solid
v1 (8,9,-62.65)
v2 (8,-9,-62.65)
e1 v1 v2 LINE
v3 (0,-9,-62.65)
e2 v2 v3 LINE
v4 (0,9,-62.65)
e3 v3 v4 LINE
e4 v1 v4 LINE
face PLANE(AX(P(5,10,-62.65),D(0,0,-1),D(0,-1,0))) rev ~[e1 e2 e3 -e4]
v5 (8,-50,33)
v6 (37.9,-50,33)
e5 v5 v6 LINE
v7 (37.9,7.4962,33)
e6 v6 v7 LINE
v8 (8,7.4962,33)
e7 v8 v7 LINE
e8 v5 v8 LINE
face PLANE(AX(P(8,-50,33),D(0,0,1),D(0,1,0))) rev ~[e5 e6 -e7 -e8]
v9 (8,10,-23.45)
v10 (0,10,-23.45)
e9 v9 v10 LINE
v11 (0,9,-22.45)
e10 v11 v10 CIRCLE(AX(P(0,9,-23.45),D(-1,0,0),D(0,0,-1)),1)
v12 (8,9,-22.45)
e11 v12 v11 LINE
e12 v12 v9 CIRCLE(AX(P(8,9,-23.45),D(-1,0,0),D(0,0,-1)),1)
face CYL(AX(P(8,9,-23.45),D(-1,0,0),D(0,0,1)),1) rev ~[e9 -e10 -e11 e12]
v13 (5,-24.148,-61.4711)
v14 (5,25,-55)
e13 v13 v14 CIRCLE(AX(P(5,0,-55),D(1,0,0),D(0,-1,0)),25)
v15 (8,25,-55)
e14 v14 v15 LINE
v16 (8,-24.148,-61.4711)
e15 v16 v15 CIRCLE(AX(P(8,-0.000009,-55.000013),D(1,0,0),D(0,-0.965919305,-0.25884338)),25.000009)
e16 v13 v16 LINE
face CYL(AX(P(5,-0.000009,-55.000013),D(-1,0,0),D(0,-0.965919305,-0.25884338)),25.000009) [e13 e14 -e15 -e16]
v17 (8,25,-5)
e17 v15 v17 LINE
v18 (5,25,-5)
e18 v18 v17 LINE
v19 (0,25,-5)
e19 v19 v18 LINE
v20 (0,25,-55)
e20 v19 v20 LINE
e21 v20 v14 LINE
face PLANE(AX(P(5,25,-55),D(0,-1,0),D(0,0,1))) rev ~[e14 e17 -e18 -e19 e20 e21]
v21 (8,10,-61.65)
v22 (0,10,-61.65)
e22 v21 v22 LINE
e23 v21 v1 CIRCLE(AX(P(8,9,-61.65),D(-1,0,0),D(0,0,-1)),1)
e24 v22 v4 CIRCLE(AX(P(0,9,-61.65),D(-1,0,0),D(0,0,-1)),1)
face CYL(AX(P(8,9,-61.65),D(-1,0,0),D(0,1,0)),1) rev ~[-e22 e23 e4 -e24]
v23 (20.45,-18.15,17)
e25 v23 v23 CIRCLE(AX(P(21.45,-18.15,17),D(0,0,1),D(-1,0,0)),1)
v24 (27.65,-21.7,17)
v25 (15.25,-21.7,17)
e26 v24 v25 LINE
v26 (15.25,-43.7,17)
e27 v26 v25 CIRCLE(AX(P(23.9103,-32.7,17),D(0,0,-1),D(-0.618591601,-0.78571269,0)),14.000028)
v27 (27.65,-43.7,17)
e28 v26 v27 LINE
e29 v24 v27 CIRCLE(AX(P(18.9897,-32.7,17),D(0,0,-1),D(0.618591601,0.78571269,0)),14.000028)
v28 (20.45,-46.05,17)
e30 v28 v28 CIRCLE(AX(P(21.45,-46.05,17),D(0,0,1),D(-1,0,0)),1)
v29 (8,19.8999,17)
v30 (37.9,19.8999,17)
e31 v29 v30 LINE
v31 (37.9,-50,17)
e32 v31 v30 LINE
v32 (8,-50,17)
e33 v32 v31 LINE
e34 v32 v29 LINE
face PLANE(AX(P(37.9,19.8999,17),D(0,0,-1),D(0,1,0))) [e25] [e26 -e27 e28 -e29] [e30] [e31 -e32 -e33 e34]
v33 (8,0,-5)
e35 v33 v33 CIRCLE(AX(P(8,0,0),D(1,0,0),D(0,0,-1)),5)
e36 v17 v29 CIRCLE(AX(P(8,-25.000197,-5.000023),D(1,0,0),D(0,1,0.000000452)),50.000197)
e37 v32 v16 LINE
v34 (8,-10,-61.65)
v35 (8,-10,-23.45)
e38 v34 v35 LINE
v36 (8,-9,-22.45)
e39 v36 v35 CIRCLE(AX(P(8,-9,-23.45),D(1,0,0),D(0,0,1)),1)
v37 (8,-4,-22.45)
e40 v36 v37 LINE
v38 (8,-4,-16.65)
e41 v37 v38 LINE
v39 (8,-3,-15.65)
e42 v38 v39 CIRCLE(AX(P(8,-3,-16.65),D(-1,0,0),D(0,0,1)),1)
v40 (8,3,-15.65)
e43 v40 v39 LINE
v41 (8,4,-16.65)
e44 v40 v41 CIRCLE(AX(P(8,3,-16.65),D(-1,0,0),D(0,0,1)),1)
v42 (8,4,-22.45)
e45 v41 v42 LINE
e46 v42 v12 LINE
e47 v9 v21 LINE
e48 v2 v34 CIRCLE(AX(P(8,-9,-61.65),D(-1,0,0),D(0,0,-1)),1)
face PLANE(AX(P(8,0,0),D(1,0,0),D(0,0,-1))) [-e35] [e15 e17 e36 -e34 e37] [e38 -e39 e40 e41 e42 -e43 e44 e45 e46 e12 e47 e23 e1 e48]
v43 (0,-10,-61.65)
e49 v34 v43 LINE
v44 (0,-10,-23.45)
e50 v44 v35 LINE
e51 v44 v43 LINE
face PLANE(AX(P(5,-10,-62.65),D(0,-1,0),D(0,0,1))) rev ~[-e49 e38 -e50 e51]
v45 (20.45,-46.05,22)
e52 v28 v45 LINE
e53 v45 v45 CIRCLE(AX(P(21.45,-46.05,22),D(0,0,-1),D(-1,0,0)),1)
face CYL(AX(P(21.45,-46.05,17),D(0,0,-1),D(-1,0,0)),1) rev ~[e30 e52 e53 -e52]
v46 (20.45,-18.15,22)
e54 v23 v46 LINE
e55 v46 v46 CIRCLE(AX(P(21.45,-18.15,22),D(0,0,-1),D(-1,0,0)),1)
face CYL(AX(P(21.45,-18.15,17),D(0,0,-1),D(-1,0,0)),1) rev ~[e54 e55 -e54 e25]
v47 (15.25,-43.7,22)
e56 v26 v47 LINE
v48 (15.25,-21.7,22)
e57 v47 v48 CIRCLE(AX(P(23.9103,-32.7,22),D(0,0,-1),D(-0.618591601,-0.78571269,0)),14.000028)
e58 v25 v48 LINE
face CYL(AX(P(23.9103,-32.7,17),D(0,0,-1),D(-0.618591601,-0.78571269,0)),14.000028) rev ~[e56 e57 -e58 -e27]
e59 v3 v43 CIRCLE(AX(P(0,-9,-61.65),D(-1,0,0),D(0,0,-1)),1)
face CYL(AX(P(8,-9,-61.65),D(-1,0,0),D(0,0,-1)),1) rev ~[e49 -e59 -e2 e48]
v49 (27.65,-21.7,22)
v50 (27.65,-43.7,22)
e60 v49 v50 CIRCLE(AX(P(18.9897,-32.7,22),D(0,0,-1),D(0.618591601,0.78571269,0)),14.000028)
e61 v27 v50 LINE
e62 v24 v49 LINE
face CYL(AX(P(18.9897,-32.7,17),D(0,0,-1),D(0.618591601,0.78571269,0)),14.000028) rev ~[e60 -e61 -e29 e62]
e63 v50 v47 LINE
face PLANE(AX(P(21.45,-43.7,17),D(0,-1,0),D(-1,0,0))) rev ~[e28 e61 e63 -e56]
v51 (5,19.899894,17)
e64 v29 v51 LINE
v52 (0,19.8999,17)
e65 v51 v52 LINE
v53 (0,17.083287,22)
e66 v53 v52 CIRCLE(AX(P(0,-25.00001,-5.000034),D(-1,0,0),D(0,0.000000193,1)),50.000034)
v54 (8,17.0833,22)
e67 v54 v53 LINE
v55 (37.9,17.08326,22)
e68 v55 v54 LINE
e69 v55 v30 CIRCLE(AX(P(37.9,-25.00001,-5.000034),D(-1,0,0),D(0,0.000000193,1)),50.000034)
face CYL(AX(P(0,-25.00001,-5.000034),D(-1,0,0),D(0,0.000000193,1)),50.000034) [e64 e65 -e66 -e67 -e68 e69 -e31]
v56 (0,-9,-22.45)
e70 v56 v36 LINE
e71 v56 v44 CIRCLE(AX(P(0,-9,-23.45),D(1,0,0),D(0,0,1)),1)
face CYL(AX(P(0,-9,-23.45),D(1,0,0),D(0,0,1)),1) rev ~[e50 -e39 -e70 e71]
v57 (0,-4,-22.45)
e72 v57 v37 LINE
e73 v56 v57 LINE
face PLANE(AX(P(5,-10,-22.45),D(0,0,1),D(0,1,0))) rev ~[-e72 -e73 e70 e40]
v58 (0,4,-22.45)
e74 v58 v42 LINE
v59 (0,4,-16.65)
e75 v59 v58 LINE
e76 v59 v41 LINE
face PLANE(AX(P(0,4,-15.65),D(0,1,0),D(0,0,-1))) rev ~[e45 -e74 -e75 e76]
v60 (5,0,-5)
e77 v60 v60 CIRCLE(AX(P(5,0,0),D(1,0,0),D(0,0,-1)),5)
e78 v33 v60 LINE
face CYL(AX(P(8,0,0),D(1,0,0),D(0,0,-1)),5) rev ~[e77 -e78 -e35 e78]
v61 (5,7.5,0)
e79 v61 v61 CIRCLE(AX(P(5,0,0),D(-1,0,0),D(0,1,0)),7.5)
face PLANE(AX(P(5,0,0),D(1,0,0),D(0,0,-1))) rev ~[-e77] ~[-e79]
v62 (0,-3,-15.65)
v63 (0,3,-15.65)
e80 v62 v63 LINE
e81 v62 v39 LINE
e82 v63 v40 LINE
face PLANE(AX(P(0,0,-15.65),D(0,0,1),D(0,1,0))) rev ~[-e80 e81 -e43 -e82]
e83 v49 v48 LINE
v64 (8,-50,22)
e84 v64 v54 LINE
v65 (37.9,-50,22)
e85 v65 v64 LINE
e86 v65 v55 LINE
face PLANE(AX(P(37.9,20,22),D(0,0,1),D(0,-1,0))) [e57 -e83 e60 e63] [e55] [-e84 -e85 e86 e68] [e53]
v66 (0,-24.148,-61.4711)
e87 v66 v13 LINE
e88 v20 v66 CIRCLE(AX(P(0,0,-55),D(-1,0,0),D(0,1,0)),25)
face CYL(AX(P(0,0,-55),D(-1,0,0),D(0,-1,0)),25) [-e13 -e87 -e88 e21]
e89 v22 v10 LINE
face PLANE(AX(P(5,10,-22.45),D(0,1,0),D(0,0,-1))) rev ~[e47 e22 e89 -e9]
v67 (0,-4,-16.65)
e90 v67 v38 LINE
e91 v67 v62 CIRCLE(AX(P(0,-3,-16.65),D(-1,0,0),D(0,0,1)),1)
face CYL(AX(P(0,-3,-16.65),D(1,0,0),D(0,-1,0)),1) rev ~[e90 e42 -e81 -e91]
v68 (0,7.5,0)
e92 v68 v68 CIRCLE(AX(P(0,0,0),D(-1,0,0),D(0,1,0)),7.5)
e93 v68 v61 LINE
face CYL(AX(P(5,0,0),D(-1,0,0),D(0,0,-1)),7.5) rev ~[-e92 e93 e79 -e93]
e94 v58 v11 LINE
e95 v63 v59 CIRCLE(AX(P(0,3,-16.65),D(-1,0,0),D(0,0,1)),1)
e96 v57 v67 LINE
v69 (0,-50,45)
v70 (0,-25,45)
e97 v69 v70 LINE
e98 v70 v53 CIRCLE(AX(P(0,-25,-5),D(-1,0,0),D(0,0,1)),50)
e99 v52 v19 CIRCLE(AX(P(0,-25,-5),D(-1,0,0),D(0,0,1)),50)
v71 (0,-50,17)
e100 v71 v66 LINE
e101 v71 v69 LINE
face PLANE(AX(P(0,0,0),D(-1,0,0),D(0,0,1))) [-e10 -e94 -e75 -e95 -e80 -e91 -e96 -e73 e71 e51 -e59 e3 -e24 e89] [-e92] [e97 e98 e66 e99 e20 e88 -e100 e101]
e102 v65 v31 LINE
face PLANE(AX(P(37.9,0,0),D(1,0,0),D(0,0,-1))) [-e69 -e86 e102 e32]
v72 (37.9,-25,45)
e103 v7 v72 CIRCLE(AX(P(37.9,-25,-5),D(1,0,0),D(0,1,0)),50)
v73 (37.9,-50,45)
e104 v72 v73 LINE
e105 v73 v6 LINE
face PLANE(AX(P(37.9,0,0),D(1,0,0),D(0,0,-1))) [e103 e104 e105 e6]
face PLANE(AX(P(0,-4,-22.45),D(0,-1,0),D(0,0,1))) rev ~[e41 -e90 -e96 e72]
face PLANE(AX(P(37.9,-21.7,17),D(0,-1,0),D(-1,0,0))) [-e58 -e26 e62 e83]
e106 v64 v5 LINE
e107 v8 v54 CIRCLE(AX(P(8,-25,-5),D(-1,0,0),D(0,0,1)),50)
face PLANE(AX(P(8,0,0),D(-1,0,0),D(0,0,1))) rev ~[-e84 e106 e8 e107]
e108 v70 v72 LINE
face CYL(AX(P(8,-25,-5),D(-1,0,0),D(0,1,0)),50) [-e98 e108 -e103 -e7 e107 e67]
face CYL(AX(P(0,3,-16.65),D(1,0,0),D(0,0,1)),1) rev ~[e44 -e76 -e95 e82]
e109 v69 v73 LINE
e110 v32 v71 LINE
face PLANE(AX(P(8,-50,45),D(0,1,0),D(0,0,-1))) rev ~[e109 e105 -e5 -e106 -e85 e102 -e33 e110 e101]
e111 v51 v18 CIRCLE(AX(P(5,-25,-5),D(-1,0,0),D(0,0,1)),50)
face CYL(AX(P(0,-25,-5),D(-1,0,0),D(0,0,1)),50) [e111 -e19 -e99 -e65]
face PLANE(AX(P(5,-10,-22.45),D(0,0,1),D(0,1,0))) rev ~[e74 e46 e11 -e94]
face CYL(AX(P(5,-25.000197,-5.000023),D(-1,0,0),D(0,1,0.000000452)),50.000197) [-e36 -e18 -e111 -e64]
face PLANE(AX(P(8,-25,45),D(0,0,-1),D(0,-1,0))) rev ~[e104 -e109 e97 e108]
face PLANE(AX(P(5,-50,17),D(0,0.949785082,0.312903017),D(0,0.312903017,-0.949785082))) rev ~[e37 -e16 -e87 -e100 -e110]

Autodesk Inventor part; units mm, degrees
ref_plane "YZ Plane" through (0, 0, 0) normal (1, 0, 0) x (0, 1, 0)
ref_plane "XZ Plane" through (0, 0, 0) normal (0, 1, 0) x (-1, 0, 0)
ref_plane "XY Plane" through (0, 0, 0) normal (0, 0, 1) x (1, 0, 0)
sketch "Sketch1" plane through (0, 0, 0) normal (1, 0, 0) x (0, 1, 0)
  circle A0 centre (0, 0) radius 16.575
  line L0 (0, 16.575) -> (0, -49.725)
  line L1 (0, -33.15) -> (0, -15.05)
  line L2 (0, -15.05) -> (0, -70.05)
  line L3 (10, -70.05) -> (-10, -70.05)
  line L4 (-10, -70.05) -> (-10, -15.05)
  line L5 (-10, -15.05) -> (10, -15.05)
  line L6 (10, -15.05) -> (10, -70.05)
  line L7 (10, -70.05) -> (-10, -15.05) construction
  line L8 (-10, -70.05) -> (10, -15.05) construction
  line L9 (10, -62.65) -> (-10, -62.65)
  line L10 (-10, -62.65) -> (-10, -22.45)
  line L11 (-10, -22.45) -> (10, -22.45)
  line L12 (10, -22.45) -> (10, -62.65)
  line L13 (10, -62.65) -> (-10, -22.45) construction
  line L14 (-10, -62.65) -> (10, -22.45) construction
  line L15 (-4.95, -27.2) -> (-4.95, -17.7)
  line L16 (-4.95, -17.7) -> (4.95, -17.7)
  line L17 (4.95, -27.2) -> (-4.95, -17.7) construction
  line L18 (-4.95, -27.2) -> (4.95, -17.7) construction
  line L19 (4.95, -67.4) -> (-4.95, -67.4)
  line L20 (-4.95, -67.4) -> (-4.95, -57.9)
  line L21 (-4.95, -57.9) -> (4.95, -57.9)
  line L22 (4.95, -67.4) -> (-4.95, -57.9) construction
  line L23 (-4.95, -67.4) -> (4.95, -57.9) construction
  circle A1 centre (4.95, -17.7) radius 1.5
  circle A2 centre (-4.95, -17.7) radius 1.5
  circle A3 centre (4.95, -67.4) radius 1.5
  circle A4 centre (-4.95, -67.4) radius 1.5
  circle A5 centre (0, -33.15) radius 6.8
  line L24 (0, -80) -> (0, -55)
  arc A6 (-25, -55) -> (25, -55) centre (0, -55) ccw
  line L25 (0, 0) -> (0, 45)
  line L26 (25, 45) -> (-25, 45)
  line L27 (25, 45) -> (25, -55)
  line L28 (-25, 45) -> (-25, -55)
  circle A7 centre (0, 0) radius 7.5
  point P0 (0, -42.55)
  point P1 (0, -42.55)
  point P2 (0, -22.45)
  point P3 (0, -62.65)
  dimension "d0" = 33.15
  dimension "d2" = 66.3
  dimension "d4" = 18.1
  dimension "d5" = 55
  dimension "d6" = 20
  dimension "d7" = 55
  dimension "d8" = 40.2
  dimension "d9" = 9.9
  dimension "d10" = 9.5
  dimension "d11" = 9.9
  dimension "d12" = 9.5
  dimension "d13" = 3
  dimension "d14" = 3
  dimension "d15" = 3
  dimension "d16" = 3
  dimension "d17" = 13.6
  dimension "d20" = 25
  dimension "d21" = 45
  dimension "d22" = 15
extrude "Extrusion1" add sketch "Sketch1" along normal blind 5 contours A0 L5 L0 A7 | A0 L25 L26 L27 A6 L24 L3 L6 L5 | L0 A7 L5 A0 | A0 L5 L4 L3 L24 A6 L28 L26 L25 | L5 L6 L11 L0 A0 | A0 L0 L5 | L5 L0 A0 | A0 L0 L16 A2 L15 L11 L4 L5 | L0 L11 L15 A2 L16 | L6 L9 L2 L0 A5 L11 | L11 L0 A5 L2 L21 L20 L9 L4 | L6 L3 L2 L9 | L9 L20 A4 L19 L2 L3 L4 | L9 L20 L21 L2 | L2 L19 A4 L20 L9
sketch "Sketch2" plane through (5, 0, 0) normal (1, 0, 0) x (0, 0, -1)
  line L0 (-45, -25) -> (55, -25) projected
  circle A0 centre (33.15, 0) radius 6.8 projected
  line L1 (33.15, 0) -> (15.05, 0)
  line L2 (15.05, 0) -> (70.05, 0)
  line L3 (62.65, 10) -> (22.45, 10)
  line L4 (22.45, 10) -> (22.45, -10)
  line L5 (22.45, -10) -> (62.65, -10)
  line L6 (62.65, -10) -> (62.65, 10)
  line L7 (62.65, 10) -> (22.45, -10) construction
  line L8 (22.45, 10) -> (62.65, -10) construction
  point P0 (42.55, 0)
  dimension "d25" = 18.1
  dimension "d26" = 55
  dimension "d27" = 40.2
  dimension "d28" = 20
extrude "Extrusion2" cut sketch "Sketch2" against normal blind 5 contours L2 L6 L5 L4 L1 A0 | A0 L1 L4 L3 L6 L2
sketch "Sketch3" plane through (5, 0, 0) normal (1, 0, 0) x (0, 0, -1)
  circle A0 centre (17.7, 4.95) radius 1.5 projected
  circle A1 centre (17.7, -4.95) radius 1.5 projected
  circle A2 centre (67.4, 4.95) radius 1.5 projected
  circle A3 centre (67.4, -4.95) radius 1.5 projected
extrude "Extrusion3" add sketch "Sketch3" against normal blind 5
sketch "Sketch4" plane through (5, 0, 0) normal (1, 0, 0) x (0, 0, -1)
  line L0 (55, 25) -> (-45, 25) projected
  line L1 (-45, 25) -> (-45, -25) projected
  line L2 (-45, -25) -> (55, -25) projected
  line L3 (-45, 25) -> (-35, 25)
  line L4 (-35, 25) -> (-35, -25)
  line L5 (-35, -25) -> (-45, -25)
  line L6 (-45, -25) -> (-45, 25)
  dimension "d33" = 10
extrude "Extrusion4" add sketch "Sketch4" along normal blind 32.9
sketch "Sketch5" plane through (0, -25, -55) normal (0, -1, 0) x (1, 0, 0)
  line L0 (5, 90) -> (37.9, 90)
  line L1 (37.9, 90) -> (37.9, 100)
  line L2 (37.9, 100) -> (5, 100)
  line L3 (5, 100) -> (5, 90)
  point P0 (0, 55)
extrude "Extrusion5" add sketch "Sketch5" along normal blind 25
sketch "Sketch6" plane through (0, 0, 0) normal (-1, 0, 0) x (0, 0, 1)
  arc A0 (-55, 25) -> (-55, -25) centre (-55, 0) ccw projected
  line L0 (45, -25) -> (-55, -25) projected
  line L1 (-55, 25) -> (45, 25) projected
  line L2 (45, -25) -> (45, -50)
  line L3 (45, -50) -> (35, -50)
  line L4 (35, -50) -> (-61.4711, -24.148)
  line L5 (-55, -25) -> (45, -25)
  arc A1 (-61.4711, -24.148) -> (-55, -25) centre (-55, 0) ccw
  dimension "d38" = 25
  dimension "d39" = 10
extrude "Extrusion6" add sketch "Sketch6" against normal blind 5
sketch "Sketch7" plane through (0, 25, 45) normal (0, 0, 1) x (1, 0, 0)
  line L0 (37.9, -75) -> (0, -75) projected
  line L1 (0, 0) -> (37.9, 0) projected
  line L2 (18.95, -75) -> (18.95, -62.5)
  circle A0 centre (18.95, -62.5) radius 7.5
  point P0 (0, -25)
  dimension "d42" = 12.5
  dimension "d43" = 15
extrude "Extrusion7" cut sketch "Sketch7" against normal blind 10
sketch "Sketch8" plane through (5, 0, 0) normal (1, 0, 0) x (0, 0, -1)
  line L0 (-35, 25) -> (-35, -50) projected
  line L1 (55, 25) -> (-35, 25) projected
  line L2 (-35, -50) -> (-35, 25)
  line L3 (-35, -50) -> (-17, -50)
  line L4 (-17, -50) -> (-17, 25)
  line L5 (-17, -50) -> (61.4711, -24.148)
  line L6 (-17, -50) -> (-22, -50)
  line L7 (-22, -50) -> (-22, 25)
  line L8 (-17, 25) -> (-22, 25)
  dimension "d46" = 18
  dimension "d47" = 5
extrude "Extrusion8" add sketch "Sketch8" along normal blind 32.9 contours L1 L4 L3 L7
sketch "Sketch9" plane through (0, 0, 0) normal (-1, 0, 0) x (0, 0, 1)
  line L0 (-61.4711, -24.148) -> (35, -50) projected
  arc A0 (-55, 25) -> (-61.4711, -24.148) centre (-55, 0) ccw projected
  line L1 (17, -50) -> (-61.4711, -24.148)
  line L2 (-61.4711, -24.148) -> (35, -50)
  line L3 (35, -50) -> (17, -50)
  line L4 (35, -50) -> (17, -50)
  line L5 (17, -50) -> (-61.4711, -24.148)
  line L6 (-61.4711, -24.148) -> (35, -50)
  point P0 (45, -50)
  dimension "d50" = 28
extrude "Extrusion9" add sketch "Sketch9" against normal blind 5
sketch "Sketch11" plane through (0, 25, 45) normal (0, 0, 1) x (1, 0, 0)
  circle A0 centre (18.95, -62.5) radius 7.5 projected
  point P0 (0, -25)
extrude "Extrusion10" add sketch "Sketch11" against normal blind 10
sketch "Sketch12" plane through (0, 25, 45) normal (0, 0, 1) x (1, 0, 0)
  line L0 (37.9, -75) -> (0, -75) projected
  line L1 (0, -75) -> (5, -75)
  line L2 (37.9, -75) -> (5, -75)
  line L3 (21.45, -75) -> (21.45, -62.5)
  circle A0 centre (21.45, -62.5) radius 6.8
  point P0 (0, -25)
  dimension "d55" = 5
  dimension "d56" = 12.5
  dimension "d57" = 13.6
extrude "Extrusion11" cut sketch "Sketch12" against normal blind 10
sketch "Sketch13" plane through (37.9, 25, 17) normal (0, 0, -1) x (-1, 0, 0)
  line L0 (32.9, -75) -> (0, -75) projected
  line L1 (16.45, -75) -> (16.45, -62.5)
  circle A0 centre (16.45, -62.5) radius 6.2
  line L2 (16.45, -62.5) -> (16.45, -50.3)
  circle A1 centre (16.45, -56.4) radius 3.1
  point P0 (37.9, -25)
  dimension "d60" = 12.5
  dimension "d61" = 12.4
  dimension "d62" = 12.2
  dimension "d63" = 6.2
extrude "Extrusion12" cut sketch "Sketch13" against normal blind 5
sketch "Sketch15" plane through (37.9, 25, 17) normal (0, 0, -1) x (-1, 0, 0)
  arc A0 (13.4271, -57.0869) -> (19.4729, -57.0869) centre (16.45, -62.5) ccw projected
  line L0 (32.9, -75) -> (0, -75) projected
  line L1 (16.45, -62.5) -> (16.45, -73.1)
  circle A1 centre (16.45, -73.1) radius 1
  line L2 (16.45, -62.5) -> (16.45, -41.1)
  circle A2 centre (16.45, -41.1) radius 1
  point P0 (37.9, -25)
  dimension "d66" = 10.6
  dimension "d67" = 2
  dimension "d68" = 21.4
  dimension "d69" = 2
extrude "Extrusion13" cut sketch "Sketch15" against normal blind 5
sketch "Sketch16" plane through (37.9, 25, 17) normal (0, 0, -1) x (-1, 0, 0)
  circle A0 centre (16.45, -73.1) radius 1 projected
  circle A1 centre (16.45, -41.1) radius 1 projected
  line L0 (32.9, -75) -> (0, -75) projected
  line L1 (16.45, -41.1) -> (16.45, -43.15)
  line L2 (16.45, -73.1) -> (16.45, -71.05)
  point P0 (37.9, -25)
  dimension "d72" = 2.05
  dimension "d73" = 2.05
extrude "Extrusion14" add sketch "Sketch16" against normal blind 5
sketch "Sketch17" plane through (37.9, 25, 17) normal (0, 0, -1) x (-1, 0, 0)
  arc A0 (13.4271, -57.0869) -> (19.4729, -57.0869) centre (16.45, -62.5) ccw projected
  line L0 (32.9, -75) -> (0, -75) projected
  line L1 (16.45, -62.5) -> (16.45, -41.1)
  line L2 (16.45, -41.1) -> (16.45, -43.15)
  circle A1 centre (16.45, -43.15) radius 1
  line L3 (16.45, -62.5) -> (16.45, -73.1)
  line L4 (16.45, -73.1) -> (16.45, -71.05)
  circle A2 centre (16.45, -71.05) radius 1
  point P0 (37.9, -25)
  dimension "d76" = 21.4
  dimension "d77" = 2.05
  dimension "d78" = 2
  dimension "d79" = 10.6
  dimension "d80" = 2.05
  dimension "d81" = 2
extrude "Extrusion15" cut sketch "Sketch17" against normal blind 5
sketch "Sketch18" plane through (0, 0, 0) normal (-1, 0, 0) x (0, 0, 1)
  line L0 (45, 25) -> (45, -50) projected
  line L1 (-55, 25) -> (45, 25) projected
  line L2 (45, 25) -> (45, -20)
  line L3 (45, 25) -> (0, 25)
  line L4 (0, 25) -> (-5, 25)
  line L5 (45, -20) -> (45, -25)
  arc A0 (45, -25) -> (-5, 25) centre (-5, -25) ccw
  dimension "d84" = 45
  dimension "d86" = 5
  dimension "d87" = 5
extrude "Extrusion16" cut sketch "Sketch18" against normal blind 39
sketch "Sketch19" plane through (37.9, -50, 17) normal (0, 0, -1) x (-1, 0, 0)
  line L0 (32.9, 0) -> (32.9, 69.8999) projected
  arc A0 (13.4271, 17.9131) -> (19.4729, 17.9131) centre (16.45, 12.5) ccw projected
  arc A1 (19.4729, 17.9131) -> (13.4271, 17.9131) centre (16.45, 18.6) ccw projected
  line L1 (0, 25) -> (0, 0) projected
  line L2 (0, 6.3) -> (32.9, 6.3)
  line L3 (0, 6.3) -> (0, 28.3)
  line L4 (0, 55) -> (0, 25) projected
  line L5 (0, 28.3) -> (32.9, 28.3)
  line L6 (32.9, 28.3) -> (32.9, 6.3)
  point P0 (37.9, 50)
  dimension "d90" = 22
extrude "Extrusion17" cut sketch "Sketch19" against normal blind 5
sketch "Sketch21" plane through (5, 0, 0) normal (1, 0, 0) x (0, 0, -1)
  line L0 (22.45, -10) -> (22.45, 10) projected
  line L1 (22.45, 10) -> (62.65, 10) projected
  line L2 (62.65, 10) -> (62.65, -10) projected
  line L3 (62.65, -10) -> (22.45, -10) projected
  circle A0 centre (0, 0) radius 7.5 projected
  arc A1 (-22, 17.0833) -> (-35, 5) centre (5, -25) ccw projected
  line L4 (-35, 5) -> (-35, -50) projected
  line L5 (-35, -50) -> (-22, -50) projected
  line L6 (-22, -43.7) -> (-22, -50) projected
  line L7 (-17, -43.7) -> (-22, -43.7) projected
  line L8 (-17, -50) -> (-17, -43.7) projected
  line L9 (-17, -50) -> (61.4711, -24.148) projected
  arc A2 (61.4711, -24.148) -> (55, 25) centre (55, 0) ccw projected
  line L10 (55, 25) -> (5, 25) projected
  arc A3 (5, 25) -> (-17, 19.8999) centre (5, -25) ccw projected
  line L11 (-17, -21.7) -> (-17, 19.8999) projected
  line L12 (-17, -21.7) -> (-22, -21.7) projected
  line L13 (-22, 17.0833) -> (-22, -21.7) projected
extrude "Extrusion18" add sketch "Sketch21" along normal blind 3
sketch "Sketch22" plane through (0, -50, 45) normal (0, 0, 1) x (1, 0, 0)
  circle A0 centre (21.45, 12.5) radius 6.8 projected
  circle A1 centre (21.45, 12.5) radius 5
  point P0 (0, 50)
  dimension "d95" = 10
extrude "Extrusion19" add sketch "Sketch22" against normal blind 2
sketch "Sketch23" plane through (37.9, -50, 35) normal (0, 0, -1) x (-1, 0, 0)
  circle A0 centre (16.45, 12.5) radius 6.8 projected
  line L0 (29.9, 0) -> (29.9, 55) projected
  line L1 (29.9, 55) -> (0, 55) projected
  line L2 (0, 55) -> (0, 0) projected
  line L3 (29.9, 0) -> (0, 0) projected
  point P0 (37.9, 50)
extrude "Extrusion20" add sketch "Sketch23" along normal blind 2
sketch "Sketch24" plane through (37.9, -21.7, 17) normal (0, -1, 0) x (1, 0, 0)
  line L0 (-29.9, 5) -> (0, 5) projected
  line L1 (0, 0) -> (-10.25, 0)
  line L2 (-10.25, 0) -> (-10.25, 5)
  line L3 (-10.25, 5) -> (0, 5)
  line L4 (0, 5) -> (0, 0)
  line L5 (-29.9, 0) -> (-22.65, 0)
  line L6 (-22.65, 0) -> (-22.65, 5)
  line L7 (-22.65, 5) -> (-29.9, 5)
  line L8 (-29.9, 5) -> (-29.9, 0)
  point P0 (-37.9, -17)
  dimension "d100" = 10.25
  dimension "d101" = 7.25
extrude "Extrusion21" add sketch "Sketch24" along normal blind 22
sketch "Sketch25" plane through (37.9, -50, 33) normal (0, 0, -1) x (-1, 0, 0)
  circle A0 centre (16.45, 12.5) radius 6.8 projected
  circle A1 centre (16.45, 12.5) radius 5
  point P0 (37.9, 50)
  dimension "d104" = 10
extrude "Extrusion22" add sketch "Sketch25" against normal blind 2
sketch "Sketch26" plane through (8, 0, 0) normal (1, 0, 0) x (0, 0, -1)
  circle A0 centre (0, 0) radius 7.5 projected
  circle A1 centre (0, 0) radius 5
  dimension "d107" = 10
extrude "Extrusion23" add sketch "Sketch26" against normal blind 3
sketch "Sketch28" plane through (37.9, -50, 17) normal (0, 0, -1) x (-1, 0, 0)
  line L0 (10.25, 28.3) -> (10.25, 6.3) projected
  line L1 (22.65, 28.3) -> (22.65, 6.3) projected
  arc A0 (22.65, 6.3) -> (22.65, 28.3) centre (13.9897, 17.3) ccw
  arc A1 (10.25, 28.3) -> (10.25, 6.3) centre (18.9103, 17.3) ccw
  point P0 (37.9, 50)
  dimension "d111" = 14
  dimension "d112" = 14
extrude "Extrusion24" cut sketch "Sketch28" against normal blind 5
sketch "Sketch29" plane through (37.9, 0, 0) normal (1, 0, 0) x (0, 0, -1)
  arc A0 (-35, 5) -> (-45, -25) centre (5, -25) ccw projected
  line L0 (-45, -25) -> (-45, -50) projected
  line L1 (-45, -50) -> (-33, -50) projected
  line L2 (-33, 5) -> (-33, -50) projected
  line L3 (-35, 5) -> (-33, 5) projected
  point P0 (0, 0)
extrude "Extrusion25" cut sketch "Sketch29" against normal blind 29.9
sketch "Sketch30" plane through (0, -50, -55) normal (0, -1, 0) x (1, 0, 0)
  line L0 (8, 100) -> (8, 77) projected
  line L1 (8, 100) -> (0, 100) projected
  line L2 (0, 72) -> (0, 100) projected
  line L3 (8, 77) -> (0, 77)
  point P0 (0, 55)
extrude "Extrusion26" cut sketch "Sketch30" against normal blind 70
sketch "Sketch31" plane through (37.9, 0, 0) normal (1, 0, 0) x (0, 0, -1)
  line L0 (-17, -50) -> (-17, 19.8999) projected
  arc A0 (-17, 19.8999) -> (-22, 17.0833) centre (5, -25) ccw projected
  line L1 (-17, -50) -> (-17, 18)
  line L2 (-17, 18) -> (-17, 20)
  line L3 (-17, 20) -> (-22, 20)
  line L4 (-22, 20) -> (-22, 17.0833)
  line L5 (-17, 19.8999) -> (-17, 20)
  point P0 (0, 0)
  dimension "d119" = 68
  dimension "d120" = 2
  dimension "d121" = 5
extrude "Extrusion27" add sketch "Sketch31" against normal blind 37.9
sketch "Sketch32" plane through (0, 0, 0) normal (-1, 0, 0) x (0, 0, 1)
  line L0 (22, 20) -> (17, 20) projected
  line L1 (17, 20) -> (17, 19.8999) projected
  line L2 (17, -50) -> (45, -50)
  line L3 (22, -50) -> (17, -50) projected
  line L4 (45, -50) -> (45, 20)
  line L5 (45, 20) -> (22, 20)
  line L6 (45, -50) -> (45, -25)
  arc A0 (45, -25) -> (17, 19.8999) centre (-5, -25) ccw
  dimension "d124" = 28
  dimension "d125" = 70
  dimension "d127" = 25
  dimension "d128" = 50
sketch "Sketch33" plane through (0, 0, 0) normal (-1, 0, 0) x (0, 0, 1)
  line L0 (22, -50) -> (22, 20) projected
  line L1 (17, -50) -> (22, -50) projected
  line L2 (45, -50) -> (45, -25)
  arc A0 (45, -25) -> (-5, 25) centre (-5, -25) ccw
  line L3 (22, -50) -> (45, -50)
  arc A1 (45, -25) -> (22, 17.0833) centre (-5, -25) ccw
  dimension "d126" = 25
extrude "Extrusion28" cut sketch "Sketch32" against normal blind 37.9
extrude "Extrusion29" add sketch "Sketch33" against normal blind 8
sketch "Sketch34" plane through (8, 0, 0) normal (1, 0, 0) x (0, 0, -1)
  line L0 (-45, -25) -> (-45, -50) projected
  line L1 (-45, -50) -> (-33, -50)
  line L2 (-17, -50) -> (-45, -50) projected
  line L3 (-33, -50) -> (-33, 7.4962)
  arc A0 (5, 25) -> (-45, -25) centre (5, -25) ccw projected
  point P0 (0, 0)
  dimension "d133" = 12
  dimension "d134" = 90
extrude "Extrusion30" add sketch "Sketch34" along normal blind 29.9
sketch "Sketch35" plane through (0, 0, 0) normal (-1, 0, 0) x (0, 0, 1)
  line L0 (-62.65, -10) -> (-62.65, 10) projected
  line L1 (-62.65, 10) -> (-22.45, 10) projected
  line L2 (-62.65, 0) -> (-15.65, 0)
  line L3 (-22.45, -10) -> (-22.45, 10) projected
  line L4 (-22.45, 0) -> (-15.65, 0)
  line L5 (-22.45, -4) -> (-15.65, -4)
  line L6 (-15.65, -4) -> (-15.65, 4)
  line L7 (-15.65, 4) -> (-22.45, 4)
  line L8 (-22.45, 4) -> (-22.45, -4)
  line L9 (-22.45, -4) -> (-15.65, 4) construction
  line L10 (-15.65, -4) -> (-22.45, 4) construction
  point P0 (-19.05, 0)
  dimension "d137" = 47
  dimension "d138" = 8
extrude "Extrusion31" cut sketch "Sketch35" against normal blind 8 contours L3 L7 L6 L2 | L2 L6 L5 L3
fillet "Fillet1" radius 1 6 edges at (4, -4, -15.65) (4, 4, -15.65) (4, 10, -22.45) (4, 10, -62.65) (4, -10, -62.65) (4, -10, -22.45)
properties part number "packa_strana(b)"
